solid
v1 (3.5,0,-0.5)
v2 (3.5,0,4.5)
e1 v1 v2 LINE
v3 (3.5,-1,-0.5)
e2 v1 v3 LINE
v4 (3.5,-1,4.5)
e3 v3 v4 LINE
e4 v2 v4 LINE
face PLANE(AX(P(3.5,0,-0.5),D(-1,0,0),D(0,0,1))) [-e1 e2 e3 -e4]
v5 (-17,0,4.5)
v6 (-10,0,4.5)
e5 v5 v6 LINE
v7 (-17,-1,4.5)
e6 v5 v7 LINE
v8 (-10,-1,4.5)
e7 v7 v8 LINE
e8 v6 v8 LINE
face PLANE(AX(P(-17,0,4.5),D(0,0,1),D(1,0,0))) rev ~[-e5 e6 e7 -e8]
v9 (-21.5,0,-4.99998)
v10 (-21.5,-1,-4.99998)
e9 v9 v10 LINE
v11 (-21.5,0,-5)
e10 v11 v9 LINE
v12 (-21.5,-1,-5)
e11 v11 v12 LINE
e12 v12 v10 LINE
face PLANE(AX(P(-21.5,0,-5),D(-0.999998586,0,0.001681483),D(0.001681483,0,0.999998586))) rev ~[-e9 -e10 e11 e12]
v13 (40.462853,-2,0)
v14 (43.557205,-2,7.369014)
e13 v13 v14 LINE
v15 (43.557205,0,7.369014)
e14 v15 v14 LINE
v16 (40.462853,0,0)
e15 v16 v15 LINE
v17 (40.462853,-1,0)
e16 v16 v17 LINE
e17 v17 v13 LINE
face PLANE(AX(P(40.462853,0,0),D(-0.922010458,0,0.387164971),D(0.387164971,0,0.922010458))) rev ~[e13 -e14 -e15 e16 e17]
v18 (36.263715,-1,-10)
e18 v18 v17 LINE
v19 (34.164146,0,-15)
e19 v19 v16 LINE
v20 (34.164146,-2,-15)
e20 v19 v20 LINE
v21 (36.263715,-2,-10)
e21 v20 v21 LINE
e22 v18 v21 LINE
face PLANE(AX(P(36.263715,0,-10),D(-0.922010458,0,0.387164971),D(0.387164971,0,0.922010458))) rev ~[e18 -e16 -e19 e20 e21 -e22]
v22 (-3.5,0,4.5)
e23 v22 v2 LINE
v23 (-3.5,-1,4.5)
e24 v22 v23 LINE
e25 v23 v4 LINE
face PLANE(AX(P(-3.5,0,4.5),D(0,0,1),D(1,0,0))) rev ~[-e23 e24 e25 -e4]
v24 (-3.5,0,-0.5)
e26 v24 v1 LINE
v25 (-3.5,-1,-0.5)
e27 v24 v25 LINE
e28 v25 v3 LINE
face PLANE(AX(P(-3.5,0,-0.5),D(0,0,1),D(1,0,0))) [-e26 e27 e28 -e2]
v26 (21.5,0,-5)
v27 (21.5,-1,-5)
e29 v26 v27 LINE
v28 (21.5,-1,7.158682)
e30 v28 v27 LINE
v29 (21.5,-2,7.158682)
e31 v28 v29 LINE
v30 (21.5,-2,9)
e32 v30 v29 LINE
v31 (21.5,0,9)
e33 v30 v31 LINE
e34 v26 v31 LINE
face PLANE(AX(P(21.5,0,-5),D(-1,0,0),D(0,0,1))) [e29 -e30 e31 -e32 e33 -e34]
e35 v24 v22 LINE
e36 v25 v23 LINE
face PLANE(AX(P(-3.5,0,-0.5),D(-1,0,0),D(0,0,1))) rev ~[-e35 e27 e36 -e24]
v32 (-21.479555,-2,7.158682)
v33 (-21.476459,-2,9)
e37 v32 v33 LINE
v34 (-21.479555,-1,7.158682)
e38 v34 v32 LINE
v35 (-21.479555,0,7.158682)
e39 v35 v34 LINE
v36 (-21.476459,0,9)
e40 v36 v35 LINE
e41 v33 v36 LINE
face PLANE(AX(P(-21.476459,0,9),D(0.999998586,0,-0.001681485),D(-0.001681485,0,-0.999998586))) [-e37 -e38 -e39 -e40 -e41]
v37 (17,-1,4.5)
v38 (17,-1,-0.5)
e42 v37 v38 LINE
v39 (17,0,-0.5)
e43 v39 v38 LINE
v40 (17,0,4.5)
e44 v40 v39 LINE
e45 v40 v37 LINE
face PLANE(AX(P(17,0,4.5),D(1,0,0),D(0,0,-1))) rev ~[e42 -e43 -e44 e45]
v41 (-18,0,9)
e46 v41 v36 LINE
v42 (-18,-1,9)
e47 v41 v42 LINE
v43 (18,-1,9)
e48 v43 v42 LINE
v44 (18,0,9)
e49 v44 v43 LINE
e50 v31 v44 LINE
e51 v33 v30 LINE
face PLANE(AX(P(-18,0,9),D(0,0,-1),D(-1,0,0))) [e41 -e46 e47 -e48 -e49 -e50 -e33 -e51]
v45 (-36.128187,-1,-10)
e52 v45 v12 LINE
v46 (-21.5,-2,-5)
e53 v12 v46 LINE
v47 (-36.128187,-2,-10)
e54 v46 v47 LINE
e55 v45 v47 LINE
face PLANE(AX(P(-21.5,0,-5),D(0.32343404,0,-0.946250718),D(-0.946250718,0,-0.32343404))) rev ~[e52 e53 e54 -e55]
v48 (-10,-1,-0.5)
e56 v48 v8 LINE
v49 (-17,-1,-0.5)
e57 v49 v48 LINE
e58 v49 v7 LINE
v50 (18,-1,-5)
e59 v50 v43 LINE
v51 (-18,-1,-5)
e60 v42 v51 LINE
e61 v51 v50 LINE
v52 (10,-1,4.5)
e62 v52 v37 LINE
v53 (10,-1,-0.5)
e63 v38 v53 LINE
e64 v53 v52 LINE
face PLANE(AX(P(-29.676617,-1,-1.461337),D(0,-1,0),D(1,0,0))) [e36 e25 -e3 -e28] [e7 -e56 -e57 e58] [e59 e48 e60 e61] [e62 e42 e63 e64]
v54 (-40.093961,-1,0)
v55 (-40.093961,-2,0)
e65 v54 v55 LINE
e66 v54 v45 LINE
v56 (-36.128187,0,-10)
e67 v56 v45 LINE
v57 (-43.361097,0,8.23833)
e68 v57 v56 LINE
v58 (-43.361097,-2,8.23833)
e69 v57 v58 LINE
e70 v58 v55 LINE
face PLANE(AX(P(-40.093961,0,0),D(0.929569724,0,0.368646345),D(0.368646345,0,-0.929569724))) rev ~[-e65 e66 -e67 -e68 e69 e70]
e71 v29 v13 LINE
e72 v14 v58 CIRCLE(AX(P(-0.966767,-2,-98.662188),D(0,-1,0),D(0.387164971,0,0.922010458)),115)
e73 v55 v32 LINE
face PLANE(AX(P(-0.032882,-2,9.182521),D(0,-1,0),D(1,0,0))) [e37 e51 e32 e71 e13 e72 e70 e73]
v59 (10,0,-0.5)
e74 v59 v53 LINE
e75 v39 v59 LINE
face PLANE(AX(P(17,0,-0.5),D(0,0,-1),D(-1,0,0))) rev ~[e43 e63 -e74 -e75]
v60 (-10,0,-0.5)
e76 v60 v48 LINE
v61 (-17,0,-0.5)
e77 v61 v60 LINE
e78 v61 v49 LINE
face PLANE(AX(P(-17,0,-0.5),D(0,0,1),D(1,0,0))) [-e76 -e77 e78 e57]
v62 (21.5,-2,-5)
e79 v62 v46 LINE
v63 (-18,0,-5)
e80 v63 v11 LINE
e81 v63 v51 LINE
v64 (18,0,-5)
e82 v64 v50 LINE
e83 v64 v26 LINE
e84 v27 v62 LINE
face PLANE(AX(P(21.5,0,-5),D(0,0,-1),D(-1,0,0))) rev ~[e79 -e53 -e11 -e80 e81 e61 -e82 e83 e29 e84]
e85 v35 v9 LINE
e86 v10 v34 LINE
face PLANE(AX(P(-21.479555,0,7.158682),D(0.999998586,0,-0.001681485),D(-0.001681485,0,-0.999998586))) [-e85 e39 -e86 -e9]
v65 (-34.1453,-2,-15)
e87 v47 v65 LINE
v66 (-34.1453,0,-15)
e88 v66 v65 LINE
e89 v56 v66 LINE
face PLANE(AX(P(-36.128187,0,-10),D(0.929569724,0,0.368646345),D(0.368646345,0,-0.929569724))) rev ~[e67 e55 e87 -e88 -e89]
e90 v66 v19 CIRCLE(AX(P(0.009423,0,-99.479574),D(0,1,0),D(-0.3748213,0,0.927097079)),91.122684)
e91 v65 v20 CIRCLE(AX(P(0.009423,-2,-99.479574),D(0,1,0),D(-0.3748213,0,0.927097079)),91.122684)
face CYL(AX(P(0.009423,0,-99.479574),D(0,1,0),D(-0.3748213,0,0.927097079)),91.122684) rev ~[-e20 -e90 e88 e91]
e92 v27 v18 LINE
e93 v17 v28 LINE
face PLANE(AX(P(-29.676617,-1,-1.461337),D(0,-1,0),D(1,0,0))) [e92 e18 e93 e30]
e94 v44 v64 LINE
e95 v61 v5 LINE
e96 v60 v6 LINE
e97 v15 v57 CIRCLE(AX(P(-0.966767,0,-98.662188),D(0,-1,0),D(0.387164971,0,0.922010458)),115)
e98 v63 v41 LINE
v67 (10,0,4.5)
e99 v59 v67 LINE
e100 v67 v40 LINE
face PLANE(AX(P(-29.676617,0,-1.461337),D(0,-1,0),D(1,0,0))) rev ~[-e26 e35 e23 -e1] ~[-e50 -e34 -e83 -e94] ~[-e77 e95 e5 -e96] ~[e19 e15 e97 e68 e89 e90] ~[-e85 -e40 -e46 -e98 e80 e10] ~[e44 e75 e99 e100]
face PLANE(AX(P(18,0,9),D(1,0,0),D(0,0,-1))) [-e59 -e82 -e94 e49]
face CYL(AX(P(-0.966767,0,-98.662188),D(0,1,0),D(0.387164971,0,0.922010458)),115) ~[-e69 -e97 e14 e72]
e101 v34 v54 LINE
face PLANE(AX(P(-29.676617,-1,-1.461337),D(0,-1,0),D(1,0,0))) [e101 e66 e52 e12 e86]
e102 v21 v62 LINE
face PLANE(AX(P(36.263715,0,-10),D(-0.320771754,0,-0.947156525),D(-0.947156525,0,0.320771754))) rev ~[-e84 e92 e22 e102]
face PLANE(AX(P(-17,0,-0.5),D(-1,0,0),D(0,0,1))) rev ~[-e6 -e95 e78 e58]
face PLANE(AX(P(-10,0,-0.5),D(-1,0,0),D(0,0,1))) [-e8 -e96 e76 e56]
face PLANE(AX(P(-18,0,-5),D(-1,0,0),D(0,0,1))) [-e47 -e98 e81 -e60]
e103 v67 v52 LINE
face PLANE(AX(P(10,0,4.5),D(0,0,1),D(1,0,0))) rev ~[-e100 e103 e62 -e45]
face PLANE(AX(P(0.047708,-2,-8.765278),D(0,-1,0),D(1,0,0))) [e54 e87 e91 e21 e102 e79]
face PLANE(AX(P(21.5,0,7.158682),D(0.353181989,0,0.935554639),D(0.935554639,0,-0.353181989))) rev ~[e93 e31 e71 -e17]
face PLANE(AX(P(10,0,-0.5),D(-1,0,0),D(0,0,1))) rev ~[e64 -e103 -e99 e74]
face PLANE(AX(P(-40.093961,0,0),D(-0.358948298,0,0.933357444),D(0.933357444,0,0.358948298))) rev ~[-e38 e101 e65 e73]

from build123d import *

# Parameters (mm, degrees)
F1_DEPTH = 2
F0_W     = 36
F0_H     = 14
F0_W_2   = 7
F0_H_2   = 5
F2_DEPTH = 1
F3_DEPTH = 2
F4_DEPTH = 1
F5_DEPTH = 1
F6_DEPTH = 2.001
F7_DEPTH = 2.001
F8_DEPTH = 1


# Not quite as in the source:
# - ends of sketch curves that miss each other by under 0.0002 mm in the source are joined


with BuildPart() as f1:
    # F0 (on Front) → F1 (new body)
    with BuildSketch(Plane.XZ):
        with BuildLine():
            Line((40.4628534786, 0), (43.5572046873, 7.3690142199))
            ThreePointArc((43.5572046873, 7.3690142199), (0.1833509298, 16.332060188), (-43.3610966095, 8.2383298181))
            Line((-43.3610966095, 8.2383298181), (-40.0939611875, 0))
            Line((-40.0939611875, 0), (-21.4795553588, 7.1586821743))
            Line((-21.4795553588, 7.1586821743), (-21.4764592054, 9.000000095))
            Line((-21.4764592054, 9.000000095), (-18, 9.000000095))
            Line((-18, 9.000000095), (18, 9.000000095))
            Line((18, 9.000000095), (21.5, 9.000000095))
            Line((21.5, 9.000000095), (21.5, 7.1586821743))
            Line((21.5, 7.1586821743), (40.4628534786, 0))
        make_face()
    extrude(amount=F1_DEPTH)

    # F0 (on Front) → F2 (join)
    with BuildSketch(Plane.XZ):
        Polygon((21.5, -4.999999905), (21.5, 7.1586821743), (21.5, 9.000000095), (18, 9.000000095), (18, -4.999999905), align=None)
        with Locations((0, 2.000000095)):
            Rectangle(F0_W, F0_H)
        with Locations((-13.5, 2.000000095)):
            Rectangle(F0_W_2, F0_H_2, mode=Mode.SUBTRACT)
        with Locations((0, 2.000000095)):
            Rectangle(F0_W_2, F0_H_2, mode=Mode.SUBTRACT)
        Polygon((17, 4.500000095), (17, -0.499999905), (15, -0.499999905), (10, -0.499999905), (10, 2.500000095), (10, 4.500000095), align=None, mode=Mode.SUBTRACT)
        Polygon((-21.4764592054, 9.000000095), (-21.4795553588, 7.1586821743), (-21.5, -4.9999801132), (-18, -4.999999905), (-18, 9.000000095), align=None)
    extrude(amount=F2_DEPTH)

    # F0 (on Front) → F3 (join)
    with BuildSketch(Plane.XZ):
        with BuildLine():
            Line((34.164145572, -15), (36.2637148742, -10))
            Line((36.2637148742, -10), (21.5, -4.999999905))
            Line((21.5, -4.999999905), (18, -4.999999905))
            Line((18, -4.999999905), (-18, -4.999999905))
            Line((-18, -4.999999905), (-21.5, -4.999999905))
            Line((-21.5, -4.999999905), (-36.1281871846, -10))
            Line((-36.1281871846, -10), (-34.1453001831, -15))
            ThreePointArc((-34.1453001831, -15), (0.0094226944, -8.3568901314), (34.164145572, -15))
        make_face()
    extrude(amount=F3_DEPTH)

    # F0 (on Front) → F4 (join)
    with BuildSketch(Plane.XZ):
        Polygon((36.2637148742, -10), (40.4628534786, 0), (21.5, 7.1586821743), (21.5, -4.999999905), align=None)
    extrude(amount=F4_DEPTH)

    # F0 (on Front) → F5 (join)
    with BuildSketch(Plane.XZ):
        Polygon((-21.4795553588, 7.1586821743), (-40.0939611875, 0), (-36.1281871846, -10), (-21.5, -4.999999905), align=None)
    extrude(amount=F5_DEPTH)

    # F0 (on Front) → F6 (cut, through all)
    with BuildSketch(Plane.XZ):
        Polygon((21.5, -4.999999905), (21.5, 7.1586821743), (21.5, 9.000000095), (18, 9.000000095), (18, -4.999999905), align=None)
    extrude(amount=F6_DEPTH, mode=Mode.SUBTRACT)

    # F0 (on Front) → F7 (cut, through all)
    with BuildSketch(Plane.XZ):
        Polygon((-21.4764592054, 9.000000095), (-21.4795553588, 7.1586821743), (-21.5, -4.9999801132), (-18, -4.999999905), (-18, 9.000000095), align=None)
    extrude(amount=F7_DEPTH, mode=Mode.SUBTRACT)

    # F0 (on Front) → F8 (join)
    with BuildSketch(Plane.XZ):
        with Locations((0, 2.000000095)):
            Rectangle(F0_W, F0_H)
        with Locations((-13.5, 2.000000095)):
            Rectangle(F0_W_2, F0_H_2, mode=Mode.SUBTRACT)
        with Locations((0, 2.000000095)):
            Rectangle(F0_W_2, F0_H_2, mode=Mode.SUBTRACT)
        Polygon((17, 4.500000095), (17, -0.499999905), (15, -0.499999905), (10, -0.499999905), (10, 2.500000095), (10, 4.500000095), align=None, mode=Mode.SUBTRACT)
    extrude(amount=F8_DEPTH)


solid = f1.part
